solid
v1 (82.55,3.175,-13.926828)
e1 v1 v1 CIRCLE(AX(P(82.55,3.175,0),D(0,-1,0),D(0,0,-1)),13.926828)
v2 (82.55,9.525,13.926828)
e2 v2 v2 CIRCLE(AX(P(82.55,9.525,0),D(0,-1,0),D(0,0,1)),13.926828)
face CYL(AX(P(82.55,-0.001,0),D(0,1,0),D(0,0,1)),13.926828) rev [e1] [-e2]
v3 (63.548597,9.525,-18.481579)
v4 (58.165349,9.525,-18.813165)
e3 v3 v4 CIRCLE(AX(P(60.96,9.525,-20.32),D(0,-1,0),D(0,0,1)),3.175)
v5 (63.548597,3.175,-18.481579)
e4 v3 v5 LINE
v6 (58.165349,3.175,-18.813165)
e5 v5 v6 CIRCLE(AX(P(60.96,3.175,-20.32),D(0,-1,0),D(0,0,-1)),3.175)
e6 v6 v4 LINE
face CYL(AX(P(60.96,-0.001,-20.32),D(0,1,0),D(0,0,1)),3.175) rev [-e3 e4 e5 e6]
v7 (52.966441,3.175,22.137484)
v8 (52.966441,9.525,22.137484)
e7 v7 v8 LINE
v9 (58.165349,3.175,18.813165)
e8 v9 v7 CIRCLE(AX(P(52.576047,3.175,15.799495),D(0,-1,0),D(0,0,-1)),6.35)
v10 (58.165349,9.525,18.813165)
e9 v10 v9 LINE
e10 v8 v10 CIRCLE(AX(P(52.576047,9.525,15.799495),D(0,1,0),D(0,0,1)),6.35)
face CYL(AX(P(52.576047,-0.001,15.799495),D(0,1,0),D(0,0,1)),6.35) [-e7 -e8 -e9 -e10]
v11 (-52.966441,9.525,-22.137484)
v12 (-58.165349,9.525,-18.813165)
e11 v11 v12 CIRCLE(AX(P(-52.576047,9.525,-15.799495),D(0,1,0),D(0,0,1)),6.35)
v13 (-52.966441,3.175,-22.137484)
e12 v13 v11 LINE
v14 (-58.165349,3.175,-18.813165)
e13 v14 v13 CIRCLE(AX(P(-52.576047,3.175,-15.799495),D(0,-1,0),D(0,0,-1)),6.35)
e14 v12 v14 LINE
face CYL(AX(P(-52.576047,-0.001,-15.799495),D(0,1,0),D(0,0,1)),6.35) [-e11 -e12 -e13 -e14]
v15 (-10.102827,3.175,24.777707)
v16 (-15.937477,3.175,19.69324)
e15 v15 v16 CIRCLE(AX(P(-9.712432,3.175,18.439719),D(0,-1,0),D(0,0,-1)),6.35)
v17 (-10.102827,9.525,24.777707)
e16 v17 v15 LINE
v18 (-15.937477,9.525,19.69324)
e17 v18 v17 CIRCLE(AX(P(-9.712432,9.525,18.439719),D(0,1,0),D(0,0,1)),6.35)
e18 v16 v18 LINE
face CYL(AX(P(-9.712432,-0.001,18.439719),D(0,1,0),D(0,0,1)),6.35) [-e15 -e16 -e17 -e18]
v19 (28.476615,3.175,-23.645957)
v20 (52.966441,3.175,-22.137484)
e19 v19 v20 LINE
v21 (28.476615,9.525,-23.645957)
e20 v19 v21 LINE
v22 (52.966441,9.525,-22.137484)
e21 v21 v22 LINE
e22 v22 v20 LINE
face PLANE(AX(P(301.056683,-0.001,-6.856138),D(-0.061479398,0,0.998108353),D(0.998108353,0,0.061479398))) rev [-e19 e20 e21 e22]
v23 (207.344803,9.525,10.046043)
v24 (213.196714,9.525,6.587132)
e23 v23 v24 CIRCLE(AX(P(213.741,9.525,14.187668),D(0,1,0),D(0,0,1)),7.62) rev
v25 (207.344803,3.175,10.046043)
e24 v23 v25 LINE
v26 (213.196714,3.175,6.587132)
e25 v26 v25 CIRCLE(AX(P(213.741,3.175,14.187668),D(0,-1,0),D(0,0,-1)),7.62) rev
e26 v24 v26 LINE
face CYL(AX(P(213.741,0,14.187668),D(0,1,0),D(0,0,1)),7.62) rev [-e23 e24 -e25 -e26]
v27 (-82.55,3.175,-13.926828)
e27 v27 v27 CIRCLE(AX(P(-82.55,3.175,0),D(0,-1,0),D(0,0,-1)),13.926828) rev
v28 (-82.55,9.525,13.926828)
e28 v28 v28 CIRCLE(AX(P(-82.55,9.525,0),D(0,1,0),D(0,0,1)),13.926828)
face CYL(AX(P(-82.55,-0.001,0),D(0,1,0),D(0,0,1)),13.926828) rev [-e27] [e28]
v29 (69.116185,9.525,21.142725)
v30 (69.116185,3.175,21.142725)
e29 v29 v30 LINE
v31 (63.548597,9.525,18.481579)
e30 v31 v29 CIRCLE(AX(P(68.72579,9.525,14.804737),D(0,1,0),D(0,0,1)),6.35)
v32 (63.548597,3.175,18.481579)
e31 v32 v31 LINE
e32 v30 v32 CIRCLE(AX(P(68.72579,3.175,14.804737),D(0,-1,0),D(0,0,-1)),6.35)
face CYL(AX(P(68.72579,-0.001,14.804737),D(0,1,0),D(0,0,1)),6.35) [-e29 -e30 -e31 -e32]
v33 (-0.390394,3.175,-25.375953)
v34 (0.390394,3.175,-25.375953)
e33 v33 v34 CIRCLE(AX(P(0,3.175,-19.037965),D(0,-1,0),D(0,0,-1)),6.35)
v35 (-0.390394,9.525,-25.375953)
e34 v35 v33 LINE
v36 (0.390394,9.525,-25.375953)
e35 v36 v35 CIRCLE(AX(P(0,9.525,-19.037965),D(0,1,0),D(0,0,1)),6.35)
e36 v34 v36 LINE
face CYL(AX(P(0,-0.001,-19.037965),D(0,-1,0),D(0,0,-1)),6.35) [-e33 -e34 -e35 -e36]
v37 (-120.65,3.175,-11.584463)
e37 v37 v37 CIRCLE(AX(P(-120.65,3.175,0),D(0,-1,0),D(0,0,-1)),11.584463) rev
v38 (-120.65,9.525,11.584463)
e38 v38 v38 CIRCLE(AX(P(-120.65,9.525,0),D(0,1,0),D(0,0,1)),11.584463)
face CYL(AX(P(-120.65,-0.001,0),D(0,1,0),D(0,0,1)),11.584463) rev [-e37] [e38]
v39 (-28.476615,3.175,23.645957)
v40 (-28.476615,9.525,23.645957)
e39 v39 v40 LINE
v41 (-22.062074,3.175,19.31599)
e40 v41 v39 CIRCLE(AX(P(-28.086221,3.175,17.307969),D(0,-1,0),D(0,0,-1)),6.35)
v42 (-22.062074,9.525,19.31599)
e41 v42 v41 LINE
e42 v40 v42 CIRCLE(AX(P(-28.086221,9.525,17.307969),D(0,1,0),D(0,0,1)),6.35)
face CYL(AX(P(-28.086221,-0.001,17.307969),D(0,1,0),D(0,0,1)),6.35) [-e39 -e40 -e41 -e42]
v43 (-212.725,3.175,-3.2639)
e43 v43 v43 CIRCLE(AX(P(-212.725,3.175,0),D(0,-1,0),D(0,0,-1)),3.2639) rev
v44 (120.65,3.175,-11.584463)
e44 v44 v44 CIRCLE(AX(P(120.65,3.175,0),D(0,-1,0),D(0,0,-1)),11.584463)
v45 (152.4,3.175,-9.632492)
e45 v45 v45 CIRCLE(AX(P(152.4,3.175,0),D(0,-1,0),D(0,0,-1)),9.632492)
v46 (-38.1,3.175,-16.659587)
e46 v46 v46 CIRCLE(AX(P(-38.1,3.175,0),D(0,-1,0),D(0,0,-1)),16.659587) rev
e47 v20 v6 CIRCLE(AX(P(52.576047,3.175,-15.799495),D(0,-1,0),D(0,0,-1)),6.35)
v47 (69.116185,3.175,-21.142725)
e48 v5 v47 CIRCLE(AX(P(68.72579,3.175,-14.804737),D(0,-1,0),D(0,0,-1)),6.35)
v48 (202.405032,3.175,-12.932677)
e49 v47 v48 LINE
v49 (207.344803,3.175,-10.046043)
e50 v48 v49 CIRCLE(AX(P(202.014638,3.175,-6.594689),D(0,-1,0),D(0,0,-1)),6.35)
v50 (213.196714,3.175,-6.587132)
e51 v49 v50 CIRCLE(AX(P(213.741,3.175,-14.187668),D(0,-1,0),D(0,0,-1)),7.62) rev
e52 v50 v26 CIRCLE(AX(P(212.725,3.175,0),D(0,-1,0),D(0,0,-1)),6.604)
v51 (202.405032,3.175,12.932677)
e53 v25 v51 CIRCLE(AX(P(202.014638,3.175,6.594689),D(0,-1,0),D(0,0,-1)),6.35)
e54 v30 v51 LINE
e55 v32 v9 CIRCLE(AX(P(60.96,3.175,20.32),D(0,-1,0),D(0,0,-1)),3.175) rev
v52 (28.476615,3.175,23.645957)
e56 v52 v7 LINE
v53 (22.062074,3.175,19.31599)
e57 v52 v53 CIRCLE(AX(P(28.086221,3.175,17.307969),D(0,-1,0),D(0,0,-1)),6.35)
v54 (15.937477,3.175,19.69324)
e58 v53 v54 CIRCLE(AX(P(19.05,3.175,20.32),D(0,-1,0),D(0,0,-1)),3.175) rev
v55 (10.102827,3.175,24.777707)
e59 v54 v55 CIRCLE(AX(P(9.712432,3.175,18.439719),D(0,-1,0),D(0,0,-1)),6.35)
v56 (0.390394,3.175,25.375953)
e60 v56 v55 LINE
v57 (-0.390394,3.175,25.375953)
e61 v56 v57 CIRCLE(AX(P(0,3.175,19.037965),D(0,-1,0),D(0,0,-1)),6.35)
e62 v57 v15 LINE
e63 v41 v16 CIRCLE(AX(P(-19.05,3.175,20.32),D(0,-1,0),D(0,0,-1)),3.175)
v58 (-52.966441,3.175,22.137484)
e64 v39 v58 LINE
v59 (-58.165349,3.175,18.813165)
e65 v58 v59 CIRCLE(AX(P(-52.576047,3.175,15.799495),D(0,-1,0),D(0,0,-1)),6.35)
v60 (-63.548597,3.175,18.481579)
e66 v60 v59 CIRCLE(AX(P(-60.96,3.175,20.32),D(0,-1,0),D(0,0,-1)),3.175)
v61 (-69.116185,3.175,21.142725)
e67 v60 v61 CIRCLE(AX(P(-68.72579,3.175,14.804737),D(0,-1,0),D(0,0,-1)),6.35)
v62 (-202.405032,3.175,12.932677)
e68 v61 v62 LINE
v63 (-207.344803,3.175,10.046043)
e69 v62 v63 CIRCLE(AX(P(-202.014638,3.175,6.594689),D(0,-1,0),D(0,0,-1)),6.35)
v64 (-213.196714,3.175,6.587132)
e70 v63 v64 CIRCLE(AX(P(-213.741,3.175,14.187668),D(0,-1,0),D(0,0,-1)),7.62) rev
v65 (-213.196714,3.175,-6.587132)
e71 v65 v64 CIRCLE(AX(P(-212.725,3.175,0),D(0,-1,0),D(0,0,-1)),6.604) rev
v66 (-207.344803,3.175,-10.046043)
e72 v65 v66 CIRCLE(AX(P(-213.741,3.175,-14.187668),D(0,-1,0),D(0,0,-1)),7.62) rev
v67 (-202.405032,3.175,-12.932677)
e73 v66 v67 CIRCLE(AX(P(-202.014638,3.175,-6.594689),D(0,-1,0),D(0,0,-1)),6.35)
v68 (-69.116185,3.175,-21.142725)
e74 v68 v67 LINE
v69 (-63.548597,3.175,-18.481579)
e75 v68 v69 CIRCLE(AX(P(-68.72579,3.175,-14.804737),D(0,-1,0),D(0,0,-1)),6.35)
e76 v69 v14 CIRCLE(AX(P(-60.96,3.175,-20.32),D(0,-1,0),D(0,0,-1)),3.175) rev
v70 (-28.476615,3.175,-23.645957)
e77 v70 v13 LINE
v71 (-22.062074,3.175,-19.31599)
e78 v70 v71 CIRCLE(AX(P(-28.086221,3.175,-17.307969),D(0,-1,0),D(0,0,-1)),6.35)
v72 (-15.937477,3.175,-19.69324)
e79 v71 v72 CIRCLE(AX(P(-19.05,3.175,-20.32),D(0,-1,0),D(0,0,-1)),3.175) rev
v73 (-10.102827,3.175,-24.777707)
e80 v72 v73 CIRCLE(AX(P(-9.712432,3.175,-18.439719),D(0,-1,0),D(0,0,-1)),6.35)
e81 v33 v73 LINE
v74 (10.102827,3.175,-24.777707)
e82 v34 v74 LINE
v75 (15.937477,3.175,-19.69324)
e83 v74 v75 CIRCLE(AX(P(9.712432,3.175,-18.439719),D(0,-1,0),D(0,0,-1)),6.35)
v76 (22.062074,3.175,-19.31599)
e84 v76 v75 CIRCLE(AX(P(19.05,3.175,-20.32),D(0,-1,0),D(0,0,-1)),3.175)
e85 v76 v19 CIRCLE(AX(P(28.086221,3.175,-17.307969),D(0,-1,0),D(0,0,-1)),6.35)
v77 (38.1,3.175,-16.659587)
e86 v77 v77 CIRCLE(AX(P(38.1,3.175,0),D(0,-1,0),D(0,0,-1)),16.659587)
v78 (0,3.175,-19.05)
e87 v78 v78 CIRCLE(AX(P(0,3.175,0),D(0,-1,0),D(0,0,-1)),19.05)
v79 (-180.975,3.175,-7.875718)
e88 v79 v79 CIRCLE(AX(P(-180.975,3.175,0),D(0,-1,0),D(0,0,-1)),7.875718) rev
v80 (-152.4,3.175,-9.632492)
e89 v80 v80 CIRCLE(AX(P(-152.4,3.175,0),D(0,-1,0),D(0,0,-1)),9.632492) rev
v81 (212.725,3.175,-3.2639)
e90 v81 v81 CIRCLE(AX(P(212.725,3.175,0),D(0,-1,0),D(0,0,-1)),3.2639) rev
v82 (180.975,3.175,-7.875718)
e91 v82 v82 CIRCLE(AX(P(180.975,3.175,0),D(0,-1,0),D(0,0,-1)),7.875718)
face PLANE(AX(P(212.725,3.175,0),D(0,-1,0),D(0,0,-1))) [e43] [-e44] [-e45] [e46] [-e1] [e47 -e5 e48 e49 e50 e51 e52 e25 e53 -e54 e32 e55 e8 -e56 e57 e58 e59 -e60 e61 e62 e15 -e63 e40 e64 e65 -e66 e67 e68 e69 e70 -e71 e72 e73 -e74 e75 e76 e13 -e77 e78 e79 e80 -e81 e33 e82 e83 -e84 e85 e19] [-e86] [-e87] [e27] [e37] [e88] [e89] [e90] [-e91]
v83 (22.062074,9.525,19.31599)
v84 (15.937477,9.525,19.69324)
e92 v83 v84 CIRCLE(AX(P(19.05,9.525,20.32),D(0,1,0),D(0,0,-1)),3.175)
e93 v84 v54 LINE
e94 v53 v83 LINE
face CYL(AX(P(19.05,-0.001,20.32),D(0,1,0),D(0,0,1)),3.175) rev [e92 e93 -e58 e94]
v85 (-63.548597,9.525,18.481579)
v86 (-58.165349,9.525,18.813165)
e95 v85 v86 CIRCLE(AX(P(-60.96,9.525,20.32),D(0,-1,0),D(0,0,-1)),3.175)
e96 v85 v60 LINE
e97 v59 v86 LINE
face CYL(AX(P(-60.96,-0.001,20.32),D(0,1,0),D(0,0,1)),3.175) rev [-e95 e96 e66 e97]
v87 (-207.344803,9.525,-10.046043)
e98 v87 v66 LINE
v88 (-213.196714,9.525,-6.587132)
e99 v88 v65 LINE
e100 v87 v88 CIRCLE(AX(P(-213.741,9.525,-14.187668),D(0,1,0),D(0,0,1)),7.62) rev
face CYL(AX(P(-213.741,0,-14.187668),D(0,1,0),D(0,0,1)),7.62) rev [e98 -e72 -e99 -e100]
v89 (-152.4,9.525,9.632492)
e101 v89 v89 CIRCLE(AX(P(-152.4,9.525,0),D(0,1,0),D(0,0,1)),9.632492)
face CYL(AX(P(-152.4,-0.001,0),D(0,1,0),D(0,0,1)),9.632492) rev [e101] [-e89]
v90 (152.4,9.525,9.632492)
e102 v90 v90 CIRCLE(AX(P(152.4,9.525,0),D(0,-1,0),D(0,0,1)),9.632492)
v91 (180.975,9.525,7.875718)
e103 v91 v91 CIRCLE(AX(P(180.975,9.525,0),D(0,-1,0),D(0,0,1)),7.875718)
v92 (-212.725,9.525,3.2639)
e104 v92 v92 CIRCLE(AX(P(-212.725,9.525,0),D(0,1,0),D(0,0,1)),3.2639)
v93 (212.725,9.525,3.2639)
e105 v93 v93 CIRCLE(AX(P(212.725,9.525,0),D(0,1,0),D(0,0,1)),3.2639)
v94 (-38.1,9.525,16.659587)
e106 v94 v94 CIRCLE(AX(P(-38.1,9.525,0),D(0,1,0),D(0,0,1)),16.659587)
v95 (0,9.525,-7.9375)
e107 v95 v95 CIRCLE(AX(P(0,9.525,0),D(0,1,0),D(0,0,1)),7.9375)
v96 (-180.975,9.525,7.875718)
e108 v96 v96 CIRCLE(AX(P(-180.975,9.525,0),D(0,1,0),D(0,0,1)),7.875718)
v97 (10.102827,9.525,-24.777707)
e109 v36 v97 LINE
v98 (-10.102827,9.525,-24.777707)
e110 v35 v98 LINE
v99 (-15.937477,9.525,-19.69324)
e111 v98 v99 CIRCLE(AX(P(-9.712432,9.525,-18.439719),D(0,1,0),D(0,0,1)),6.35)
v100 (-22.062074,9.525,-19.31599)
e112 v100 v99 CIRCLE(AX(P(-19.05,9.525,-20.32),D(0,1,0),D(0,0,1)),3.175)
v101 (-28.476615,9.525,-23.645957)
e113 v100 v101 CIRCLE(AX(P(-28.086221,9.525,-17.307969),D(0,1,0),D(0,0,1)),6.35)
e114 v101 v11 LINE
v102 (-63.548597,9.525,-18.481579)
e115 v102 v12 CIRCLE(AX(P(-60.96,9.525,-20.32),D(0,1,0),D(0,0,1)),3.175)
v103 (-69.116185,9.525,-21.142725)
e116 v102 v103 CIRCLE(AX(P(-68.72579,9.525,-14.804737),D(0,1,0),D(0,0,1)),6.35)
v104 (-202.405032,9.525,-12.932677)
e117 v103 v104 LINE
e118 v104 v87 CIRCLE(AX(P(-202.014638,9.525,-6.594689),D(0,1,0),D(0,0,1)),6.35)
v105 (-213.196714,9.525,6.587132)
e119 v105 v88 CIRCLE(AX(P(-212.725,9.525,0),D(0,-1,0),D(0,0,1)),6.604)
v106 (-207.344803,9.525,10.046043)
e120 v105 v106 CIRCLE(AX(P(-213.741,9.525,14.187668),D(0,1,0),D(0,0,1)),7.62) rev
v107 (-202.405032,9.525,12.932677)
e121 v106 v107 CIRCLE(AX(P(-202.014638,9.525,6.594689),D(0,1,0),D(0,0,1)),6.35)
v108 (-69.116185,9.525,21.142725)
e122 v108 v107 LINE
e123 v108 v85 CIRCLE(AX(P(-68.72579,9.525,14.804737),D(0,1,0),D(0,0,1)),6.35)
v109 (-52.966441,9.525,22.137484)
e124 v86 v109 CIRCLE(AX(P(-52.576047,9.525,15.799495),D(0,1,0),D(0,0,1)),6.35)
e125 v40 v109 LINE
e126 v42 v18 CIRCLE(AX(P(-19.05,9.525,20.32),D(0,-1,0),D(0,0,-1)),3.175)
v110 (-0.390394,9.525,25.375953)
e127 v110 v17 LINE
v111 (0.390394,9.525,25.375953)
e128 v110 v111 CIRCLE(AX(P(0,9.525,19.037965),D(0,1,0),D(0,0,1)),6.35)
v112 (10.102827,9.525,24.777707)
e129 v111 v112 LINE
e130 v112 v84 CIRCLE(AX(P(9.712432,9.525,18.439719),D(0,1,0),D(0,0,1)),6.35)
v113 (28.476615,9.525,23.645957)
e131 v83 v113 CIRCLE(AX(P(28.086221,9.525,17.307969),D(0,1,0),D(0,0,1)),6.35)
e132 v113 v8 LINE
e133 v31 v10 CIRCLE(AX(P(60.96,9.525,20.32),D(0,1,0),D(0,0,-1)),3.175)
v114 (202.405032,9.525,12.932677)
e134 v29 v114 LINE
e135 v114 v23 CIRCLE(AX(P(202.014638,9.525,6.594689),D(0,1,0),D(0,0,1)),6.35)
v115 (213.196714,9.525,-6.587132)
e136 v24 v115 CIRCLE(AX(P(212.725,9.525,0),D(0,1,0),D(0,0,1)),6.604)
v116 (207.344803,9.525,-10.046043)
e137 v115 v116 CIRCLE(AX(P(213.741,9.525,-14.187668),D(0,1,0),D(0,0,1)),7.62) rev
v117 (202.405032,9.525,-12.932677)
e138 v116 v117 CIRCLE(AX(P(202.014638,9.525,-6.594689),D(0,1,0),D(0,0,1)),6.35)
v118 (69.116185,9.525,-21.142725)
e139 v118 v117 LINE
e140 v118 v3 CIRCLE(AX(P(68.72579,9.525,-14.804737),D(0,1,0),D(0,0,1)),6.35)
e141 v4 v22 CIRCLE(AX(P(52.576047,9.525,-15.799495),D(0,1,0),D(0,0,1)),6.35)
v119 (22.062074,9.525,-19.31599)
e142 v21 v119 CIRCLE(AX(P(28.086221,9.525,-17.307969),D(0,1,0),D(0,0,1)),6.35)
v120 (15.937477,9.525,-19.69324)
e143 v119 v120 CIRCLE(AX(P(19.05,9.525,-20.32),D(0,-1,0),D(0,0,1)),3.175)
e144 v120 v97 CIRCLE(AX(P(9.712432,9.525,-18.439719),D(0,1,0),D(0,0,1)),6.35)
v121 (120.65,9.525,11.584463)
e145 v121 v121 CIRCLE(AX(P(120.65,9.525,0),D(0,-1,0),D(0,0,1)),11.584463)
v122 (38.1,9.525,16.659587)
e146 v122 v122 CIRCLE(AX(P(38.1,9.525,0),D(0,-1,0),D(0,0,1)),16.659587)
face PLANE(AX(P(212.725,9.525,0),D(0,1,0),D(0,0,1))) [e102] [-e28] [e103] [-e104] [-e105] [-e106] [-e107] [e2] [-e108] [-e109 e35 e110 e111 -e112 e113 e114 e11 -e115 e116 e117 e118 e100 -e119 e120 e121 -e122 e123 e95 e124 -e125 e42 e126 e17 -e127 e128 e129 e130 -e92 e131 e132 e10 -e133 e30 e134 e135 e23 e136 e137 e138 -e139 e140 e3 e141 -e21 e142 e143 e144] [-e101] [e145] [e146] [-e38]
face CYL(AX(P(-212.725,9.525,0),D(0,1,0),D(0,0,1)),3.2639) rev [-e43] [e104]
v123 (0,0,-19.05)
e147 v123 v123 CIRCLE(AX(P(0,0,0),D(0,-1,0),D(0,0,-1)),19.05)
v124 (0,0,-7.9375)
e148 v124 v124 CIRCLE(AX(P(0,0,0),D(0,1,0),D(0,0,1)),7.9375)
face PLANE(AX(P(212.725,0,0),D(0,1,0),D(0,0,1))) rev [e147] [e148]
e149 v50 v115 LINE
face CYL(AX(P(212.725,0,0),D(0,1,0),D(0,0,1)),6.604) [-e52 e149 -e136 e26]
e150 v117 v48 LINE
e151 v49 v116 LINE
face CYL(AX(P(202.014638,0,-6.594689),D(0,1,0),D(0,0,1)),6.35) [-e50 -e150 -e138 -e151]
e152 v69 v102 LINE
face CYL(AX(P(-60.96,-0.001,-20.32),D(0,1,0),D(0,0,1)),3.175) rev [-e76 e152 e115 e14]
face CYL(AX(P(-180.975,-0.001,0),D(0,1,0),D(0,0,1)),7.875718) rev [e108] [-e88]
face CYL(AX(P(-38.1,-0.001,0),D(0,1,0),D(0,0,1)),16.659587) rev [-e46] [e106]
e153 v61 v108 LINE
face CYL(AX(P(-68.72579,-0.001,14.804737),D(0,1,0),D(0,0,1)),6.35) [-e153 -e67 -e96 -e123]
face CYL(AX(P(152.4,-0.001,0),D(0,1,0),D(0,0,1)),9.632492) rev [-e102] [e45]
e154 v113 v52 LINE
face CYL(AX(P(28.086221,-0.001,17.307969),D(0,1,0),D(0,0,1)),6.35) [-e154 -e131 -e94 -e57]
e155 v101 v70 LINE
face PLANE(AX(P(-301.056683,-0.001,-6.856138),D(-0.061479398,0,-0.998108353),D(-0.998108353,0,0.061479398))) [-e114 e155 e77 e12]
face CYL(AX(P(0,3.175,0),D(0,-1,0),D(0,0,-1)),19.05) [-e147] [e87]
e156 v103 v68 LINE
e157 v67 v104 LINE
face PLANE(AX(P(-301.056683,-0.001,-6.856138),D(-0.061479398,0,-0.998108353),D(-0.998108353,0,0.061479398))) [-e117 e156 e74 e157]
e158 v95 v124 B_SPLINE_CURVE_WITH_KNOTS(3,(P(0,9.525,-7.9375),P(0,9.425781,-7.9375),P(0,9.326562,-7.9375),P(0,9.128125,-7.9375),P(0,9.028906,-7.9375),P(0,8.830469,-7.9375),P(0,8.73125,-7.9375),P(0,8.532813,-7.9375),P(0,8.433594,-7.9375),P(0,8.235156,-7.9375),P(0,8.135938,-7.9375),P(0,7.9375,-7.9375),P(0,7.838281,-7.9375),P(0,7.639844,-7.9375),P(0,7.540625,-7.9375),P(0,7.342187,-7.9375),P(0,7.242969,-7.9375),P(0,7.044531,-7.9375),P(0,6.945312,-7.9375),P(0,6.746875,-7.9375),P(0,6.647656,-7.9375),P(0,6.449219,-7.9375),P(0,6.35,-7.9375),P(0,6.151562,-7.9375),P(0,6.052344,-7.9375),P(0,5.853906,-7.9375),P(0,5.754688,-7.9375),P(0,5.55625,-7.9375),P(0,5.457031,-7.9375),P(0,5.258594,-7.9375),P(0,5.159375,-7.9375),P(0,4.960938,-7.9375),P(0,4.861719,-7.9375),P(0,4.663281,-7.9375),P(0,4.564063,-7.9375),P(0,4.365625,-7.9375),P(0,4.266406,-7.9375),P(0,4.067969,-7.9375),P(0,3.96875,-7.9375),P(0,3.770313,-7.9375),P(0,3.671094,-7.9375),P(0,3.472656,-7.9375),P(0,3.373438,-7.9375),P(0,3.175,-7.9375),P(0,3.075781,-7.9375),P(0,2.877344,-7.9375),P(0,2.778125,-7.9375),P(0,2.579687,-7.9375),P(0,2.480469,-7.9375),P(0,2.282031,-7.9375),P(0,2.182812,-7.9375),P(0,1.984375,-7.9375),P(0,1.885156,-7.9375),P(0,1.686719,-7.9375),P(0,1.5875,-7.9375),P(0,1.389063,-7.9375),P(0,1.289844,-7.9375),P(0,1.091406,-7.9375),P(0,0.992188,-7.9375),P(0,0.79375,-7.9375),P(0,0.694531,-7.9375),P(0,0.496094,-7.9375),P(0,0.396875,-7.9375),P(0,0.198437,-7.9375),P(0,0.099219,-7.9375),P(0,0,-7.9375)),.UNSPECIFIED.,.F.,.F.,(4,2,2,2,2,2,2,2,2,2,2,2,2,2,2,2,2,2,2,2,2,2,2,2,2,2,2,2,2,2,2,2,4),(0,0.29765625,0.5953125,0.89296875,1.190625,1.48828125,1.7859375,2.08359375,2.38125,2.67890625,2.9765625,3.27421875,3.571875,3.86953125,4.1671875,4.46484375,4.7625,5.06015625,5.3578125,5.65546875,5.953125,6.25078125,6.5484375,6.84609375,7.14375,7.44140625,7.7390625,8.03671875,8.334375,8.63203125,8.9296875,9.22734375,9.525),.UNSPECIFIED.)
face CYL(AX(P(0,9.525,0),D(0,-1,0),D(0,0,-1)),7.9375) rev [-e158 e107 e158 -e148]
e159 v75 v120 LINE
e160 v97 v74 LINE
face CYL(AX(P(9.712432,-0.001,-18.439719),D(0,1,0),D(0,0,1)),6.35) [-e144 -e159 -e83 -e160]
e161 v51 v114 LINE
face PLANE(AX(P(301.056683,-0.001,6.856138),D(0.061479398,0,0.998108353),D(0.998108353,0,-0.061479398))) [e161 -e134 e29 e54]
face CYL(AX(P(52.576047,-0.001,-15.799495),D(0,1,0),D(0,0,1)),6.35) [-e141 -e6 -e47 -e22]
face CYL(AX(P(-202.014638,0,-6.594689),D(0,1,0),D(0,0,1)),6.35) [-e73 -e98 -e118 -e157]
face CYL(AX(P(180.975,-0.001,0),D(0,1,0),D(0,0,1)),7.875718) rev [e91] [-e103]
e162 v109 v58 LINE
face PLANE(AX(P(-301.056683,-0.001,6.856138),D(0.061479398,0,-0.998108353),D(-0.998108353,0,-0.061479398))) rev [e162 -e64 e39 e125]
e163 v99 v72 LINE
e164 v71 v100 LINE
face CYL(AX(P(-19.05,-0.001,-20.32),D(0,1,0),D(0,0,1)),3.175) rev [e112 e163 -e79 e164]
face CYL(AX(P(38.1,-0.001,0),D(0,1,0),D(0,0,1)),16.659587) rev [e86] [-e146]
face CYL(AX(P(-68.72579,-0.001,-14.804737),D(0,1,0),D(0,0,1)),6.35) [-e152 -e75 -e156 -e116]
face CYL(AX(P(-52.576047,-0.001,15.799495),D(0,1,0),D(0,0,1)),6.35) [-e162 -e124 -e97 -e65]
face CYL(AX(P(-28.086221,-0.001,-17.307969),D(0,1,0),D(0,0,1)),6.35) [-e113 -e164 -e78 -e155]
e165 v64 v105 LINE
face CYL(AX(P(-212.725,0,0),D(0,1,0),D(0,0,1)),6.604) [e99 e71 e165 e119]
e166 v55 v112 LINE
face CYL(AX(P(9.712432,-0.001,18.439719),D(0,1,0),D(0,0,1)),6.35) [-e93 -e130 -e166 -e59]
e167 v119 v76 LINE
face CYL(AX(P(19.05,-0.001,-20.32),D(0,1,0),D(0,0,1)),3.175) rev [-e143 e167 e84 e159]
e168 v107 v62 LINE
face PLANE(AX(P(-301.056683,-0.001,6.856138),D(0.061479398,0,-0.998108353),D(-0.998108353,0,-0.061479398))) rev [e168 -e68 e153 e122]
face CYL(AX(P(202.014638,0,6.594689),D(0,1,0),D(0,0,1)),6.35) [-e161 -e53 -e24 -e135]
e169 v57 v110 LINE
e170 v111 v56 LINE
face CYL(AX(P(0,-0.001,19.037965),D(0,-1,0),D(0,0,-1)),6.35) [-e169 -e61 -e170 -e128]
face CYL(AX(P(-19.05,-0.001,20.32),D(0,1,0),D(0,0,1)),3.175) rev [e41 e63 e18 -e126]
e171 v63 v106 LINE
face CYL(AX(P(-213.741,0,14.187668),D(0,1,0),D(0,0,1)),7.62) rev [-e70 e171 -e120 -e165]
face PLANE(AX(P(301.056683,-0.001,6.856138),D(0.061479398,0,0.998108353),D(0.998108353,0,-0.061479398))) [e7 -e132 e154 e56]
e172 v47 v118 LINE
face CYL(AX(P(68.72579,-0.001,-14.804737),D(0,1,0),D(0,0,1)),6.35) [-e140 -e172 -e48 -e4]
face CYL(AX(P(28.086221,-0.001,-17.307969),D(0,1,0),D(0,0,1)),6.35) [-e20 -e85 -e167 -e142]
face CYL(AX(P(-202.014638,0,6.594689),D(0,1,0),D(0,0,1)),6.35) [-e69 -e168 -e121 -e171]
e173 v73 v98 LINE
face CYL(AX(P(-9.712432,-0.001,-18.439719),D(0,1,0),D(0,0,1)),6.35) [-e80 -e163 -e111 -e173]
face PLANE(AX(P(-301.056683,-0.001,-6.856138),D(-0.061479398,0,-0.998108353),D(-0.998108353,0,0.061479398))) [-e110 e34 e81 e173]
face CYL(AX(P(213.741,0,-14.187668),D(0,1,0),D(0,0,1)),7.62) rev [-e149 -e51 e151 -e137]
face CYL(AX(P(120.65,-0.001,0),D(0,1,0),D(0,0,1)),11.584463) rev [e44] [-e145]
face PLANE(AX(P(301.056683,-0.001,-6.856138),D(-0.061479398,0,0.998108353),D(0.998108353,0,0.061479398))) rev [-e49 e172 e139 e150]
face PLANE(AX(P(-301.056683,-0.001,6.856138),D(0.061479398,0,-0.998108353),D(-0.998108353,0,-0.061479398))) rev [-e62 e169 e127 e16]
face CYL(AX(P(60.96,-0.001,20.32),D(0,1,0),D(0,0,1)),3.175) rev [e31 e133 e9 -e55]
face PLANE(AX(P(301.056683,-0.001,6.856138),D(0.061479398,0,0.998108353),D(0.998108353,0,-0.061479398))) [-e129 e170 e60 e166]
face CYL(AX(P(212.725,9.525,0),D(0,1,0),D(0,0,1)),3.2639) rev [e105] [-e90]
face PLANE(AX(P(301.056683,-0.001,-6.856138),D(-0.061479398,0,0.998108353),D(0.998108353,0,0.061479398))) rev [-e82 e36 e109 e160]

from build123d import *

# Parameters (mm, degrees)
SKETCH1_R                = 7.9375
BOSS_EXTRUDE1_DEPTH      = 9.525
F_5_16_18_TAPPED_HOLE1_D = 6.5278
SKETCH6_R                = 19.05
CUT_EXTRUDE2_DEPTH       = 3.175
CUT_EXTRUDE3_DEPTH       = 232.948907359
FILLET1_R                = 7.62
FILLET2_START            = 2
FILLET2_DEPTH            = 9
CUT_EXTRUDE4_REACH       = 224.817
FILLET3_R                = 6.35
CUT_EXTRUDE5_REACH       = 223
MIRROR3_COPY_1_REACH     = 223
FILLET4_R                = 6.35
CUT_EXTRUDE7_REACH       = 223
FILLET7_R                = 6.35
CUT_EXTRUDE8_REACH       = 222.999
SKETCH12_R               = 16.659587092
SKETCH12_R_2             = 13.926827849
SKETCH12_R_3             = 11.584462784
SKETCH12_R_4             = 9.632491896
SKETCH12_R_5             = 7.875718097


with BuildPart() as part:
    # Sketch1 → Boss-Extrude1 (new body)
    with BuildSketch(Plane(origin=(0, 0, 0), x_dir=(1, 0, 0), z_dir=(0, 1, 0))):
        with BuildLine():
            Line((0, 38.1), (-214.368307536, 15.789717076))
            ThreePointArc((-214.368307536, 15.789717076), (-228.6, 0), (-214.368307536, -15.789717076))
            Line((-214.368307536, -15.789717076), (0, -38.1))
            Line((0, -38.1), (214.368307536, -15.789717076))
            ThreePointArc((214.368307536, -15.789717076), (228.6, 0), (214.368307536, 15.789717076))
            Line((214.368307536, 15.789717076), (0, 38.1))
        make_face()
        with Locations(Location((0, 0, 0), (0, 0, 90))):
            Circle(SKETCH1_R, mode=Mode.SUBTRACT)
    extrude(amount=BOSS_EXTRUDE1_DEPTH)

    # 5/16-18 Tapped Hole1 (through all)
    with Locations(Plane(origin=(0, 9.525, 0), x_dir=(-1, 0, 0), z_dir=(0, 1, 0))):
        with Locations((212.725, 0), (-212.725, 0)):
            Hole(F_5_16_18_TAPPED_HOLE1_D / 2)

    # Sketch6 → Cut-Extrude2 (cut)
    with BuildSketch(Plane.XZ):
        with BuildLine():
            Line((214.368307536, 15.789717076), (0, 38.1))
            Line((0, 38.1), (-214.368307536, 15.789717076))
            ThreePointArc((-214.368307536, 15.789717076), (-228.6, 0), (-214.368307536, -15.789717076))
            Line((-214.368307536, -15.789717076), (0, -38.1))
            Line((0, -38.1), (214.368307536, -15.789717076))
            ThreePointArc((214.368307536, -15.789717076), (228.6, 0), (214.368307536, 15.789717076))
        make_face()
        with Locations(Location((0, 0, 0), (0, 0, 270))):
            Circle(SKETCH6_R, mode=Mode.SUBTRACT)
    extrude(amount=-CUT_EXTRUDE2_DEPTH, mode=Mode.SUBTRACT)

    # Sketch7 → Cut-Extrude3 (cut, through all)
    with BuildSketch(Plane(origin=(0, 9.525, 0), x_dir=(1, 0, 0), z_dir=(0, 1, 0))):
        with BuildLine():
            Line((-206.121, 16.648051811), (-206.121, 6.604))
            Line((-206.121, 6.604), (-212.725, 6.604))
            ThreePointArc((-212.725, 6.604), (-219.329, 0), (-212.725, -6.604))
            Line((-212.725, -6.604), (-206.121, -6.604))
            Line((-206.121, -6.604), (-206.121, -16.648051811))
            Line((-206.121, -16.648051811), (-214.368307536, -15.789717076))
            ThreePointArc((-214.368307536, -15.789717076), (-228.6, 0), (-214.368307536, 15.789717076))
            Line((-214.368307536, 15.789717076), (-206.121, 16.648051811))
        make_face()
    cut_extrude3 = extrude(amount=-CUT_EXTRUDE3_DEPTH, mode=Mode.SUBTRACT)

    # Mirror1: Cut-Extrude3 across plane
    add(cut_extrude3.mirror(Plane(origin=(0, 0, 0), x_dir=(0, 0, 1), z_dir=(1, 0, 0))), mode=Mode.SUBTRACT)

    # Fillet1
    fillet1_edges = [part.edges().sort_by_distance(p)[0] for p in [
        (-206.121, 6.35, 6.604),
        (-206.121, 6.35, -6.604),
        (206.121, 6.35, -6.604),
        (206.121, 6.35, 6.604),
    ]]
    fillet(fillet1_edges, radius=FILLET1_R)

    # Fillet2: read off the stored shape, not the designer's step
    # Fillet2 outline → Fillet2 (cut)
    with BuildSketch(Plane(origin=(0, 0, 0), x_dir=(1, 0, 0), z_dir=(0, 1, 0)).offset(FILLET2_START)):
        with BuildLine():
            ThreePointArc((-206.457327809, 11.94880223), (-204.013137198, 15.59583651), (-199.962443236, 17.289000771))
            Line((-199.962443236, 17.289000771), (-206.121, 16.648051811))
            Line((-206.121, 16.648051811), (-206.121, 14.187667884))
            ThreePointArc((-206.121, 14.187667884), (-206.205551039, 13.05567453), (-206.457327809, 11.94880223))
        make_face()
        with BuildLine():
            ThreePointArc((199.962443236, 17.289000771), (204.013137198, 15.59583651), (206.457327809, 11.94880223))
            ThreePointArc((206.457327809, 11.94880223), (206.205551039, 13.05567453), (206.121, 14.187667884))
            Line((206.121, 14.187667884), (206.121, 16.648051811))
            Line((206.121, 16.648051811), (199.962443236, 17.289000771))
        make_face()
        with BuildLine():
            Line((-206.121, -16.648051811), (-199.962443236, -17.289000771))
            ThreePointArc((-199.962443236, -17.289000771), (-204.013137198, -15.59583651), (-206.457327809, -11.94880223))
            ThreePointArc((-206.457327809, -11.94880223), (-206.205551039, -13.05567453), (-206.121, -14.187667884))
            Line((-206.121, -14.187667884), (-206.121, -16.648051811))
        make_face()
        with BuildLine():
            ThreePointArc((206.457327809, -11.94880223), (204.013137198, -15.59583651), (199.962443236, -17.289000771))
            Line((199.962443236, -17.289000771), (206.121, -16.648051811))
            Line((206.121, -16.648051811), (206.121, -14.187667884))
            ThreePointArc((206.121, -14.187667884), (206.205551039, -13.05567453), (206.457327809, -11.94880223))
        make_face()
    extrude(amount=FILLET2_DEPTH, mode=Mode.SUBTRACT)

    # Sketch9 → Cut-Extrude4 (cut, up to next)
    with BuildSketch(Plane(origin=(0, 9.525, 0), x_dir=(1, 0, 0), z_dir=(0, 1, 0)), mode=Mode.PRIVATE) as cut_extrude4_sk1:
        Polygon((122.02792385, -25.4), (-122.02792385, -25.4), (0, -38.1), align=None)
    cut_extrude4_tool1 = extrude(cut_extrude4_sk1.sketch, amount=-CUT_EXTRUDE4_REACH, mode=Mode.PRIVATE) & part.part
    # Sketch9 → Cut-Extrude4 (cut, up to next)
    with BuildSketch(Plane(origin=(0, 9.525, 0), x_dir=(1, 0, 0), z_dir=(0, 1, 0)), mode=Mode.PRIVATE) as cut_extrude4_sk2:
        Polygon((122.02792385, 25.4), (-122.02792385, 25.4), (0, 38.1), align=None)
    cut_extrude4_tool2 = extrude(cut_extrude4_sk2.sketch, amount=-CUT_EXTRUDE4_REACH, mode=Mode.PRIVATE) & part.part
    add(cut_extrude4_tool1.solids().sort_by_distance((0, 9.525, 29.633333))[0], mode=Mode.SUBTRACT)
    add(cut_extrude4_tool2.solids().sort_by_distance((0, 9.525, -29.633333))[0], mode=Mode.SUBTRACT)

    # Fillet3
    fillet3_edges = [part.edges().sort_by_distance(p)[0] for p in [
        (-122.02792385, 6.35, -25.4),
        (122.02792385, 6.35, -25.4),
        (122.02792385, 6.35, 25.4),
        (-122.02792385, 6.35, 25.4),
    ]]
    fillet(fillet3_edges, radius=FILLET3_R)

    # Sketch8 → Cut-Extrude5 (cut, up to next)
    with BuildSketch(Plane(origin=(0, 9.525, 0), x_dir=(1, 0, 0), z_dir=(0, 1, 0)), mode=Mode.PRIVATE) as cut_extrude5_sk1:
        with BuildLine():
            Line((-64.135, 20.32), (-64.135, 25.4))
            Line((-64.135, 25.4), (-57.785, 25.4))
            Line((-57.785, 25.4), (-57.785, 20.32))
            ThreePointArc((-57.785, 20.32), (-60.96, 17.145), (-64.135, 20.32))
        make_face()
    cut_extrude5_tool1 = extrude(cut_extrude5_sk1.sketch, amount=-CUT_EXTRUDE5_REACH, mode=Mode.PRIVATE) & part.part
    # Sketch8 → Cut-Extrude5 (cut, up to next)
    with BuildSketch(Plane(origin=(0, 9.525, 0), x_dir=(1, 0, 0), z_dir=(0, 1, 0)), mode=Mode.PRIVATE) as cut_extrude5_sk2:
        with BuildLine():
            Line((-22.225, 20.32), (-22.225, 25.4))
            Line((-22.225, 25.4), (-15.875, 25.4))
            Line((-15.875, 25.4), (-15.875, 20.32))
            ThreePointArc((-15.875, 20.32), (-19.05, 17.145), (-22.225, 20.32))
        make_face()
    cut_extrude5_tool2 = extrude(cut_extrude5_sk2.sketch, amount=-CUT_EXTRUDE5_REACH, mode=Mode.PRIVATE) & part.part
    # Sketch8 → Cut-Extrude5 (cut, up to next)
    with BuildSketch(Plane(origin=(0, 9.525, 0), x_dir=(1, 0, 0), z_dir=(0, 1, 0)), mode=Mode.PRIVATE) as cut_extrude5_sk3:
        with BuildLine():
            Line((-179.846550101, 19.382553089), (-185.655402545, 18.777999445))
            ThreePointArc((-185.655402545, 18.777999445), (-182.551338493, 17.162056585), (-179.846550101, 19.382553089))
        make_face()
    cut_extrude5_tool3 = extrude(cut_extrude5_sk3.sketch, amount=-CUT_EXTRUDE5_REACH, mode=Mode.PRIVATE) & part.part
    cut_extrude5_1 = cut_extrude5_tool1.solids().sort_by_distance((-60.96, 9.525, -21.580027))[0]
    add(cut_extrude5_1, mode=Mode.SUBTRACT)
    cut_extrude5_2 = cut_extrude5_tool2.solids().sort_by_distance((-19.05, 9.525, -21.580027))[0]
    add(cut_extrude5_2, mode=Mode.SUBTRACT)
    cut_extrude5_3 = cut_extrude5_tool3.solids().sort_by_distance((-182.668591, 9.525, -18.288679))[0]
    add(cut_extrude5_3, mode=Mode.SUBTRACT)
    cut_extrude5 = cut_extrude5_1 + cut_extrude5_2 + cut_extrude5_3  # Cut-Extrude5 as one shape, for the pattern or mirror that repeats it

    # Mirror2: Cut-Extrude5 across plane
    add(cut_extrude5.mirror(Plane(origin=(0, 0, 0), x_dir=(0, 0, 1), z_dir=(1, 0, 0))), mode=Mode.SUBTRACT)

    # Mirror3: Cut-Extrude5 across plane
    add(cut_extrude5.mirror(Plane.XY), mode=Mode.SUBTRACT)

    # Mirror3 copy 1 sketch → Mirror3 copy 1 (cut, up to next)
    with BuildSketch(Plane(origin=(0, 9.525, 0), x_dir=(-1, 0, 0), z_dir=(0, 1, 0)), mode=Mode.PRIVATE) as mirror3_copy_1_sk1:
        with BuildLine():
            Line((-64.135, 20.32), (-64.135, 25.4))
            Line((-64.135, 25.4), (-57.785, 25.4))
            Line((-57.785, 25.4), (-57.785, 20.32))
            ThreePointArc((-57.785, 20.32), (-60.96, 17.145), (-64.135, 20.32))
        make_face()
    mirror3_copy_1_tool1 = extrude(mirror3_copy_1_sk1.sketch, amount=-MIRROR3_COPY_1_REACH, mode=Mode.PRIVATE) & part.part
    # Mirror3 copy 1 sketch → Mirror3 copy 1 (cut, up to next)
    with BuildSketch(Plane(origin=(0, 9.525, 0), x_dir=(-1, 0, 0), z_dir=(0, 1, 0)), mode=Mode.PRIVATE) as mirror3_copy_1_sk2:
        with BuildLine():
            Line((-22.225, 20.32), (-22.225, 25.4))
            Line((-22.225, 25.4), (-15.875, 25.4))
            Line((-15.875, 25.4), (-15.875, 20.32))
            ThreePointArc((-15.875, 20.32), (-19.05, 17.145), (-22.225, 20.32))
        make_face()
    mirror3_copy_1_tool2 = extrude(mirror3_copy_1_sk2.sketch, amount=-MIRROR3_COPY_1_REACH, mode=Mode.PRIVATE) & part.part
    # Mirror3 copy 1 sketch → Mirror3 copy 1 (cut, up to next)
    with BuildSketch(Plane(origin=(0, 9.525, 0), x_dir=(-1, 0, 0), z_dir=(0, 1, 0)), mode=Mode.PRIVATE) as mirror3_copy_1_sk3:
        with BuildLine():
            Line((-179.846550101, 19.382553089), (-185.655402545, 18.777999445))
            ThreePointArc((-185.655402545, 18.777999445), (-182.551338493, 17.162056585), (-179.846550101, 19.382553089))
        make_face()
    mirror3_copy_1_tool3 = extrude(mirror3_copy_1_sk3.sketch, amount=-MIRROR3_COPY_1_REACH, mode=Mode.PRIVATE) & part.part
    add(mirror3_copy_1_tool1.solids().sort_by_distance((60.96, 9.525, 21.580027))[0], mode=Mode.SUBTRACT)
    add(mirror3_copy_1_tool2.solids().sort_by_distance((19.05, 9.525, 21.580027))[0], mode=Mode.SUBTRACT)
    add(mirror3_copy_1_tool3.solids().sort_by_distance((182.668591, 9.525, 18.288679))[0], mode=Mode.SUBTRACT)

    # Fillet4
    fillet4_edges = [part.edges().sort_by_distance(p)[0] for p in [
        (-15.875, 6.35, -25.4),
        (-22.225, 6.35, -25.4),
        (-57.785, 6.35, -25.4),
        (-64.135, 6.35, -25.4),
        (-185.655402545, 6.35, -18.777999445),
        (-179.846550101, 6.35, -19.382553089),
        (-179.846550101, 6.35, 19.382553089),
        (-185.655402545, 6.35, 18.777999445),
        (-57.785, 6.35, 25.4),
        (-64.135, 6.35, 25.4),
        (-15.875, 6.35, 25.4),
        (-22.225, 6.35, 25.4),
        (22.225, 6.35, 25.4),
        (15.875, 6.35, 25.4),
        (64.135, 6.35, 25.4),
        (57.785, 6.35, 25.4),
        (185.655402545, 6.35, 18.777999445),
        (179.846550101, 6.35, 19.382553089),
        (179.846550101, 6.35, -19.382553089),
        (185.655402545, 6.35, -18.777999445),
        (64.135, 6.35, -25.4),
        (57.785, 6.35, -25.4),
        (22.225, 6.35, -25.4),
        (15.875, 6.35, -25.4),
    ]]
    fillet(fillet4_edges, radius=FILLET4_R)

    # Sketch11 → Cut-Extrude7 (cut, up to next)
    with BuildSketch(Plane(origin=(0, 9.525, 0), x_dir=(1, 0, 0), z_dir=(0, 1, 0)), mode=Mode.PRIVATE) as cut_extrude7_sk1:
        with BuildLine():
            Line((-12.658744098, 24.620273065), (0, 25.4))
            Line((0, 25.4), (-9.610046345, 25.4))
            ThreePointArc((-9.610046345, 25.4), (-11.183460792, 25.201980736), (-12.658744098, 24.620273065))
        make_face()
    cut_extrude7_tool1 = extrude(cut_extrude7_sk1.sketch, amount=-CUT_EXTRUDE7_REACH, mode=Mode.PRIVATE) & part.part
    # Sketch11 → Cut-Extrude7 (cut, up to next)
    with BuildSketch(Plane(origin=(0, 9.525, 0), x_dir=(1, 0, 0), z_dir=(0, 1, 0)), mode=Mode.PRIVATE) as cut_extrude7_sk2:
        with BuildLine():
            Line((-57.206381926, 21.876320516), (-24.388531447, 23.897766071))
            ThreePointArc((-24.388531447, 23.897766071), (-26.306013929, 25.012625871), (-28.489953655, 25.4))
            Line((-28.489953655, 25.4), (-51.520046345, 25.4))
            ThreePointArc((-51.520046345, 25.4), (-54.864845646, 24.447667796), (-57.206381926, 21.876320516))
        make_face()
    cut_extrude7_tool2 = extrude(cut_extrude7_sk2.sketch, amount=-CUT_EXTRUDE7_REACH, mode=Mode.PRIVATE) & part.part
    # Sketch11 → Cut-Extrude7 (cut, up to next)
    with BuildSketch(Plane(origin=(0, 9.525, 0), x_dir=(1, 0, 0), z_dir=(0, 1, 0)), mode=Mode.PRIVATE) as cut_extrude7_sk3:
        with BuildLine():
            Line((-119.725598081, 18.025392143), (-64.511371572, 21.426362989))
            ThreePointArc((-64.511371572, 21.426362989), (-66.848010875, 24.313668159), (-70.399953655, 25.4))
            Line((-70.399953655, 25.4), (-121.698377155, 25.4))
            ThreePointArc((-121.698377155, 25.4), (-122.027480958, 25.391465973), (-122.355700169, 25.36588683))
            Line((-122.355700169, 25.36588683), (-177.035540335, 19.675107637))
            ThreePointArc((-177.035540335, 19.675107637), (-179.010961627, 19.137729041), (-180.712739107, 17.999740269))
            ThreePointArc((-180.712739107, 17.999740269), (-182.551338493, 17.162056585), (-184.523029766, 17.603186022))
            ThreePointArc((-184.523029766, 17.603186022), (-186.422669772, 18.366358927), (-188.466412312, 18.485444898))
            Line((-188.466412312, 18.485444898), (-199.962443236, 17.289000771))
            ThreePointArc((-199.962443236, 17.289000771), (-203.697537149, 15.841730432), (-206.182501509, 12.7))
            Line((-206.182501509, 12.7), (-119.725598081, 18.025392143))
        make_face()
    cut_extrude7_tool3 = extrude(cut_extrude7_sk3.sketch, amount=-CUT_EXTRUDE7_REACH, mode=Mode.PRIVATE) & part.part
    # Sketch11 → Cut-Extrude7 (cut, up to next)
    with BuildSketch(Plane(origin=(0, 9.525, 0), x_dir=(1, 0, 0), z_dir=(0, 1, 0)), mode=Mode.PRIVATE) as cut_extrude7_sk4:
        with BuildLine():
            Line((-123.816204979, -17.773427465), (-206.182501509, -12.7))
            ThreePointArc((-206.182501509, -12.7), (-203.697537149, -15.841730432), (-199.962443236, -17.289000771))
            Line((-199.962443236, -17.289000771), (-188.466412312, -18.485444898))
            ThreePointArc((-188.466412312, -18.485444898), (-186.422669772, -18.366358927), (-184.523029766, -17.603186022))
            ThreePointArc((-184.523029766, -17.603186022), (-182.551338493, -17.162056585), (-180.712739107, -17.999740269))
            ThreePointArc((-180.712739107, -17.999740269), (-179.010961627, -19.137729041), (-177.035540335, -19.675107637))
            Line((-177.035540335, -19.675107637), (-122.355700169, -25.36588683))
            ThreePointArc((-122.355700169, -25.36588683), (-122.027480958, -25.391465973), (-121.698377155, -25.4))
            Line((-121.698377155, -25.4), (-70.399953655, -25.4))
            ThreePointArc((-70.399953655, -25.4), (-66.848010875, -24.313668159), (-64.511371572, -21.426362989))
            Line((-64.511371572, -21.426362989), (-123.816204979, -17.773427465))
        make_face()
    cut_extrude7_tool4 = extrude(cut_extrude7_sk4.sketch, amount=-CUT_EXTRUDE7_REACH, mode=Mode.PRIVATE) & part.part
    # Sketch11 → Cut-Extrude7 (cut, up to next)
    with BuildSketch(Plane(origin=(0, 9.525, 0), x_dir=(1, 0, 0), z_dir=(0, 1, 0)), mode=Mode.PRIVATE) as cut_extrude7_sk5:
        with BuildLine():
            Line((-24.388531447, -23.897766071), (-57.206381926, -21.876320516))
            ThreePointArc((-57.206381926, -21.876320516), (-54.864845646, -24.447667796), (-51.520046345, -25.4))
            Line((-51.520046345, -25.4), (-28.489953655, -25.4))
            ThreePointArc((-28.489953655, -25.4), (-26.306013929, -25.012625871), (-24.388531447, -23.897766071))
        make_face()
    cut_extrude7_tool5 = extrude(cut_extrude7_sk5.sketch, amount=-CUT_EXTRUDE7_REACH, mode=Mode.PRIVATE) & part.part
    # Sketch11 → Cut-Extrude7 (cut, up to next)
    with BuildSketch(Plane(origin=(0, 9.525, 0), x_dir=(1, 0, 0), z_dir=(0, 1, 0)), mode=Mode.PRIVATE) as cut_extrude7_sk6:
        with BuildLine():
            Line((0, -25.4), (-12.658744098, -24.620273065))
            ThreePointArc((-12.658744098, -24.620273065), (-11.183460792, -25.201980736), (-9.610046345, -25.4))
            Line((-9.610046345, -25.4), (0, -25.4))
        make_face()
    cut_extrude7_tool6 = extrude(cut_extrude7_sk6.sketch, amount=-CUT_EXTRUDE7_REACH, mode=Mode.PRIVATE) & part.part
    cut_extrude7_1 = cut_extrude7_tool1.solids().sort_by_distance((-7.796401, 9.525, -25.134775))[0]
    add(cut_extrude7_1, mode=Mode.SUBTRACT)
    cut_extrude7_2 = cut_extrude7_tool2.solids().sort_by_distance((-42.473667, 9.525, -24.026292))[0]
    add(cut_extrude7_2, mode=Mode.SUBTRACT)
    cut_extrude7_3 = cut_extrude7_tool3.solids().sort_by_distance((-133.253815, 9.525, -20.136614))[0]
    add(cut_extrude7_3, mode=Mode.SUBTRACT)
    cut_extrude7_4 = cut_extrude7_tool4.solids().sort_by_distance((-133.253815, 9.525, 20.136614))[0]
    add(cut_extrude7_4, mode=Mode.SUBTRACT)
    cut_extrude7_5 = cut_extrude7_tool5.solids().sort_by_distance((-42.473667, 9.525, 24.026292))[0]
    add(cut_extrude7_5, mode=Mode.SUBTRACT)
    cut_extrude7_6 = cut_extrude7_tool6.solids().sort_by_distance((-7.796401, 9.525, 25.134775))[0]
    add(cut_extrude7_6, mode=Mode.SUBTRACT)
    cut_extrude7 = cut_extrude7_1 + cut_extrude7_2 + cut_extrude7_3 + cut_extrude7_4 + cut_extrude7_5 + cut_extrude7_6  # Cut-Extrude7 as one shape, for the pattern or mirror that repeats it

    # Mirror5: Cut-Extrude7 across plane
    add(cut_extrude7.mirror(Plane(origin=(0, 0, 0), x_dir=(0, 0, 1), z_dir=(1, 0, 0))), mode=Mode.SUBTRACT)

    # Fillet7
    # the kernel refuses this fillet: 6.35 mm, written as the material it takes off along each edge
    with BuildSketch(Plane(origin=(206.182501509, 18.98657134, 12.7), x_dir=(0.4011649267675749, 0, -0.9160058414287358), z_dir=(0, -1, 0)), Plane(origin=(-206.182501509, 18.98657134, -12.7), x_dir=(-0.4011649267675745, 0, 0.916005841428736), z_dir=(0, -1, 0))) as fillet7_piece_1:
        with BuildLine():
            CenterArc((3.920500197, -6.267024123), FILLET7_R, 99.272583276, 53.551659996)
            Line((-1.728521418, -3.366842269), (-2.29342358, -3.076824083))
            Line((-2.29342358, -3.076824083), (-0.564902162, 0.290018185))
            Line((-0.564902162, 0.290018185), (0.006065632, 0.634971029))
            ThreePointArc((0.006065632, 0.634971029), (0.870947201, 0.581225019), (2.794996109, 0.626702412))
            Line((2.794996109, 0.626702412), (2.897314662, 0))
        make_face()
    extrude(amount=25.27314268, mode=Mode.SUBTRACT)
    with BuildSketch(Plane(origin=(206.182501509, 18.98657134, -12.7), x_dir=(-0.9981083526436348, 0, -0.06147939803714307), z_dir=(0, -1, 0)), Plane(origin=(-206.182501509, 18.98657134, 12.7), x_dir=(0.9981083526436348, 0, 0.06147939803714309), z_dir=(0, -1, 0))) as fillet7_piece_2:
        with BuildLine():
            CenterArc((3.784628536, -6.35), FILLET7_R, 90, 53.551659996)
            Line((-1.323266049, -2.577479237), (-1.834055508, -2.200227161))
            ThreePointArc((-1.834055508, -2.200227161), (-0.914843774, -0.509345089), (-0.567646694, 0.284608909))
            Line((-0.567646694, 0.284608909), (0, 0.635))
            Line((0, 0.635), (3.784628536, 0.635))
            Line((3.784628536, 0.635), (3.784628536, 0))
        make_face()
    extrude(amount=25.27314268, mode=Mode.SUBTRACT)
    with BuildSketch(Plane(origin=(64.511371572, 21.058850731, 21.426362989), x_dir=(0.9981083526436348, 0, -0.061479398037142925), z_dir=(0, -1, 0))) as fillet7_piece_3:
        with BuildLine():
            CenterArc((4.613540292, -6.35), FILLET7_R, 90, 58.142371333)
            Line((-0.779909968, -2.998404218), (-1.319254994, -2.66324464))
            ThreePointArc((-1.319254994, -2.66324464), (-0.943254985, -1.505868978), (-0.602354033, 0.200984127))
            Line((-0.602354033, 0.200984127), (0, 0.635))
            Line((0, 0.635), (4.613540292, 0.635))
            Line((4.613540292, 0.635), (4.613540292, 0))
        make_face()
    extrude(amount=29.417701461, mode=Mode.SUBTRACT)
    with BuildSketch(Plane(origin=(57.206381926, 20.144940477, 21.876320516), x_dir=(0.29876629636204993, 0, -0.9543263069611483), z_dir=(0, -1, 0)), Plane(origin=(-57.206381926, 20.144940477, -21.876320516), x_dir=(-0.2987662963620492, 0, 0.9543263069611485), z_dir=(0, -1, 0))) as fillet7_piece_4:
        with BuildLine():
            CenterArc((4.415886032, -6.234400715), FILLET7_R, 100.949376744, 58.142371333)
            Line((-1.515986065, -3.968260068), (-2.109173274, -3.741646003))
            Line((-2.109173274, -3.741646003), (-0.59318721, 0.226614065))
            Line((-0.59318721, 0.226614065), (-0.09983466, 0.627102895))
            ThreePointArc((-0.09983466, 0.627102895), (2.177800026, 0.613672543), (3.089143874, 0.623440071))
            Line((3.089143874, 0.623440071), (3.209756798, 0))
        make_face()
    extrude(amount=27.589880953, mode=Mode.SUBTRACT)
    with BuildSketch(Plane(origin=(64.511371572, 21.058850731, -21.426362989), x_dir=(-0.31075545640432495, 0, 0.9504898980604369), z_dir=(0, -1, 0)), Plane(origin=(-64.511371572, 21.058850731, 21.426362989), x_dir=(0.3107554564043287, 0, -0.9504898980604356), z_dir=(0, -1, 0))) as fillet7_piece_5:
        with BuildLine():
            CenterArc((4.984134679, -6.063468935), FILLET7_R, 107.277597809, 58.142371333)
            Line((-1.161376047, -4.464970292), (-1.77592712, -4.305120427))
            Line((-1.77592712, -4.305120427), (-0.614551073, 0.159849864))
            Line((-0.614551073, 0.159849864), (-0.04288, 0.633550555))
            ThreePointArc((-0.04288, 0.633550555), (1.694822956, 0.533803797), (2.909578869, 0.606346894))
            Line((2.909578869, 0.606346894), (3.098174852, 0))
        make_face()
    extrude(amount=29.417701461, mode=Mode.SUBTRACT)
    with BuildSketch(Plane(origin=(57.206381926, 20.144940477, -21.876320516), x_dir=(-0.9981083526436348, 0, -0.061479398037143584), z_dir=(0, -1, 0)), Plane(origin=(-57.206381926, 20.144940477, 21.876320516), x_dir=(0.9981083526436348, 0, 0.06147939803714285), z_dir=(0, -1, 0))) as fillet7_piece_6:
        with BuildLine():
            CenterArc((4.247976191, -6.35), FILLET7_R, 90, 58.142371333)
            Line((-1.14547407, -2.998404218), (-1.684819096, -2.66324464))
            ThreePointArc((-1.684819096, -2.66324464), (-1.350461132, -1.815395734), (-0.550181856, 0.31705666))
            Line((-0.550181856, 0.31705666), (0, 0.635))
            Line((0, 0.635), (4.247976191, 0.635))
            Line((4.247976191, 0.635), (4.247976191, 0))
        make_face()
    extrude(amount=27.589880953, mode=Mode.SUBTRACT)
    with BuildSketch(Plane(origin=(24.388531447, 22.371468705, -23.897766071), x_dir=(-0.45274265275182435, 0, 0.8916412341178717), z_dir=(0, -1, 0)), Plane(origin=(-24.388531447, 22.371468705, 23.897766071), x_dir=(0.45274265275182174, 0, -0.8916412341178728), z_dir=(0, -1, 0))) as fillet7_piece_7:
        with BuildLine():
            CenterArc((4.201633158, -6.280494932), FILLET7_R, 81.514920071, 75.090026426)
            Line((-1.626326415, -3.759108961), (-2.209122372, -3.506970363))
            Line((-2.209122372, -3.506970363), (-0.582795957, 0.252138597))
            Line((-0.582795957, 0.252138597), (-0.246557935, 0.585178763))
            ThreePointArc((-0.246557935, 0.585178763), (4.769335233, 0.742371441), (5.232282914, 0.628049493))
            Line((5.232282914, 0.628049493), (5.138587482, 0))
        make_face()
    extrude(amount=32.042937409, mode=Mode.SUBTRACT)
    with BuildSketch(Plane(origin=(0, 10.502835163, 25.4), x_dir=(0.998108352643634, 0, -0.061479398037158), z_dir=(0, -1, 0)), Plane(origin=(0, 10.502835163, -25.4), x_dir=(-0.9981083526436356, 0, 0.061479398037131115), z_dir=(0, -1, 0))) as fillet7_piece_8:
        with BuildLine():
            CenterArc((FILLET7_R * 0.0615959157884, -FILLET7_R), FILLET7_R, 90, 7.049465664)
            Line((-FILLET7_R * 0.0611302856043, -FILLET7_R * 0.00755943276602), (0, 0))
            Line((0, 0), (FILLET7_R * 0.0615959157884, 0))
        make_face()
    extrude(amount=8.305670326, mode=Mode.SUBTRACT)
    with BuildSketch(Plane(origin=(12.658744098, 24.320639191, -24.620273065), x_dir=(-0.9981083526436348, 0, -0.06147939803714439), z_dir=(0, -1, 0)), Plane(origin=(-12.658744098, 24.320639191, 24.620273065), x_dir=(0.9981083526436348, 0, 0.06147939803714225), z_dir=(0, -1, 0))) as fillet7_piece_9:
        with BuildLine():
            CenterArc((2.560761582, -6.35), FILLET7_R, 90, 75.090026426)
            Line((-3.575442205, -4.716138599), (-4.189062584, -4.552752459))
            ThreePointArc((-4.189062584, -4.552752459), (-4.151806031, -4.391997306), (-0.270047366, 0.574716817))
            Line((-0.270047366, 0.574716817), (0, 0.635))
            Line((0, 0.635), (2.560761582, 0.635))
            Line((2.560761582, 0.635), (2.560761582, 0))
        make_face()
    extrude(amount=35.941278382, mode=Mode.SUBTRACT)
    with BuildSketch(Plane(origin=(24.388531447, 22.371468705, 23.897766071), x_dir=(0.9981083526436347, 0, -0.0614793980371442), z_dir=(0, -1, 0)), Plane(origin=(-24.388531447, 22.371468705, -23.897766071), x_dir=(-0.998108352643635, 0, 0.06147939803714275), z_dir=(0, -1, 0))) as fillet7_piece_10:
        with BuildLine():
            CenterArc((4.095831757, -6.35), FILLET7_R, 90, 75.090026426)
            Line((-2.04037203, -4.716138599), (-2.653992409, -4.552752459))
            ThreePointArc((-2.653992409, -4.552752459), (-2.57509381, -4.082470549), (-0.43917015, 0.458644284))
            Line((-0.43917015, 0.458644284), (0, 0.635))
            Line((0, 0.635), (4.095831757, 0.635))
            Line((4.095831757, 0.635), (4.095831757, 0))
        make_face()
    extrude(amount=32.042937409, mode=Mode.SUBTRACT)
    with BuildSketch(Plane(origin=(12.658744098, 24.320639191, 24.620273065), x_dir=(0.5540033325132365, 0, -0.8325144488621373), z_dir=(0, -1, 0)), Plane(origin=(-12.658744098, 24.320639191, -24.620273065), x_dir=(-0.5540033325132382, 0, 0.8325144488621363), z_dir=(0, -1, 0))) as fillet7_piece_11:
        with BuildLine():
            CenterArc((3.513133971, -5.876894553), FILLET7_R, 67.743146535, 75.090026426)
            Line((-1.547052973, -2.040619264), (-2.053071667, -1.656991735))
            Line((-2.053071667, -1.656991735), (-0.506018694, 0.383627529))
            Line((-0.506018694, 0.383627529), (-0.29483441, 0.562403477))
            ThreePointArc((-0.29483441, 0.562403477), (6.008157213, 0.655118731), (6.158767847, 0.587689455))
            Line((6.158767847, 0.587689455), (5.918255676, 0))
        make_face()
    extrude(amount=35.941278382, mode=Mode.SUBTRACT)
    with BuildSketch(Plane(origin=(-64.511371572, 21.058850731, -21.426362989), x_dir=(0.31075545640432495, 0, 0.9504898980604369), z_dir=(0, -1, 0))) as fillet7_piece_12:
        with BuildLine():
            CenterArc((4.984134679, 6.063468935), FILLET7_R, 194.580030858, 58.142371333)
            Line((-1.161376047, 4.464970292), (-1.77592712, 4.305120427))
            Line((-1.77592712, 4.305120427), (-0.614551073, -0.159849864))
            Line((-0.614551073, -0.159849864), (-0.04288, -0.633550555))
            ThreePointArc((-0.04288, -0.633550555), (1.694822956, -0.533803797), (2.909578869, -0.606346894))
            Line((2.909578869, -0.606346894), (3.098174852, 0))
        make_face()
    extrude(amount=29.417701461, mode=Mode.SUBTRACT)

    # Sketch12 → Cut-Extrude8 (cut, up to next)
    with BuildSketch(Plane(origin=(0, 9.525, 0), x_dir=(1, 0, 0), z_dir=(0, 1, 0)), mode=Mode.PRIVATE) as cut_extrude8_sk1:
        with Locations(Location((-38.1, 0, 0), (0, 0, 270))):
            Circle(SKETCH12_R)
    cut_extrude8_tool1 = extrude(cut_extrude8_sk1.sketch, amount=-CUT_EXTRUDE8_REACH, mode=Mode.PRIVATE) & part.part
    # Sketch12 → Cut-Extrude8 (cut, up to next)
    with BuildSketch(Plane(origin=(0, 9.525, 0), x_dir=(1, 0, 0), z_dir=(0, 1, 0)), mode=Mode.PRIVATE) as cut_extrude8_sk2:
        with Locations(Location((-82.55, 0, 0), (0, 0, 270))):
            Circle(SKETCH12_R_2)
    cut_extrude8_tool2 = extrude(cut_extrude8_sk2.sketch, amount=-CUT_EXTRUDE8_REACH, mode=Mode.PRIVATE) & part.part
    # Sketch12 → Cut-Extrude8 (cut, up to next)
    with BuildSketch(Plane(origin=(0, 9.525, 0), x_dir=(1, 0, 0), z_dir=(0, 1, 0)), mode=Mode.PRIVATE) as cut_extrude8_sk3:
        with Locations(Location((-120.65, 0, 0), (0, 0, 270))):
            Circle(SKETCH12_R_3)
    cut_extrude8_tool3 = extrude(cut_extrude8_sk3.sketch, amount=-CUT_EXTRUDE8_REACH, mode=Mode.PRIVATE) & part.part
    # Sketch12 → Cut-Extrude8 (cut, up to next)
    with BuildSketch(Plane(origin=(0, 9.525, 0), x_dir=(1, 0, 0), z_dir=(0, 1, 0)), mode=Mode.PRIVATE) as cut_extrude8_sk4:
        with Locations(Location((-152.4, 0, 0), (0, 0, 270))):
            Circle(SKETCH12_R_4)
    cut_extrude8_tool4 = extrude(cut_extrude8_sk4.sketch, amount=-CUT_EXTRUDE8_REACH, mode=Mode.PRIVATE) & part.part
    # Sketch12 → Cut-Extrude8 (cut, up to next)
    with BuildSketch(Plane(origin=(0, 9.525, 0), x_dir=(1, 0, 0), z_dir=(0, 1, 0)), mode=Mode.PRIVATE) as cut_extrude8_sk5:
        with Locations(Location((-180.975, 0, 0), (0, 0, 270))):
            Circle(SKETCH12_R_5)
    cut_extrude8_tool5 = extrude(cut_extrude8_sk5.sketch, amount=-CUT_EXTRUDE8_REACH, mode=Mode.PRIVATE) & part.part
    cut_extrude8_1 = cut_extrude8_tool1.solids().sort_by_distance((-38.1, 9.525, 0))[0]
    add(cut_extrude8_1, mode=Mode.SUBTRACT)
    cut_extrude8_2 = cut_extrude8_tool2.solids().sort_by_distance((-82.55, 9.525, 0))[0]
    add(cut_extrude8_2, mode=Mode.SUBTRACT)
    cut_extrude8_3 = cut_extrude8_tool3.solids().sort_by_distance((-120.65, 9.525, 0))[0]
    add(cut_extrude8_3, mode=Mode.SUBTRACT)
    cut_extrude8_4 = cut_extrude8_tool4.solids().sort_by_distance((-152.4, 9.525, 0))[0]
    add(cut_extrude8_4, mode=Mode.SUBTRACT)
    cut_extrude8_5 = cut_extrude8_tool5.solids().sort_by_distance((-180.975, 9.525, 0))[0]
    add(cut_extrude8_5, mode=Mode.SUBTRACT)
    cut_extrude8 = cut_extrude8_1 + cut_extrude8_2 + cut_extrude8_3 + cut_extrude8_4 + cut_extrude8_5  # Cut-Extrude8 as one shape, for the pattern or mirror that repeats it

    # Mirror6: Cut-Extrude8 across plane
    add(cut_extrude8.mirror(Plane(origin=(0, 0, 0), x_dir=(0, 0, 1), z_dir=(1, 0, 0))), mode=Mode.SUBTRACT)


solid = part.part
